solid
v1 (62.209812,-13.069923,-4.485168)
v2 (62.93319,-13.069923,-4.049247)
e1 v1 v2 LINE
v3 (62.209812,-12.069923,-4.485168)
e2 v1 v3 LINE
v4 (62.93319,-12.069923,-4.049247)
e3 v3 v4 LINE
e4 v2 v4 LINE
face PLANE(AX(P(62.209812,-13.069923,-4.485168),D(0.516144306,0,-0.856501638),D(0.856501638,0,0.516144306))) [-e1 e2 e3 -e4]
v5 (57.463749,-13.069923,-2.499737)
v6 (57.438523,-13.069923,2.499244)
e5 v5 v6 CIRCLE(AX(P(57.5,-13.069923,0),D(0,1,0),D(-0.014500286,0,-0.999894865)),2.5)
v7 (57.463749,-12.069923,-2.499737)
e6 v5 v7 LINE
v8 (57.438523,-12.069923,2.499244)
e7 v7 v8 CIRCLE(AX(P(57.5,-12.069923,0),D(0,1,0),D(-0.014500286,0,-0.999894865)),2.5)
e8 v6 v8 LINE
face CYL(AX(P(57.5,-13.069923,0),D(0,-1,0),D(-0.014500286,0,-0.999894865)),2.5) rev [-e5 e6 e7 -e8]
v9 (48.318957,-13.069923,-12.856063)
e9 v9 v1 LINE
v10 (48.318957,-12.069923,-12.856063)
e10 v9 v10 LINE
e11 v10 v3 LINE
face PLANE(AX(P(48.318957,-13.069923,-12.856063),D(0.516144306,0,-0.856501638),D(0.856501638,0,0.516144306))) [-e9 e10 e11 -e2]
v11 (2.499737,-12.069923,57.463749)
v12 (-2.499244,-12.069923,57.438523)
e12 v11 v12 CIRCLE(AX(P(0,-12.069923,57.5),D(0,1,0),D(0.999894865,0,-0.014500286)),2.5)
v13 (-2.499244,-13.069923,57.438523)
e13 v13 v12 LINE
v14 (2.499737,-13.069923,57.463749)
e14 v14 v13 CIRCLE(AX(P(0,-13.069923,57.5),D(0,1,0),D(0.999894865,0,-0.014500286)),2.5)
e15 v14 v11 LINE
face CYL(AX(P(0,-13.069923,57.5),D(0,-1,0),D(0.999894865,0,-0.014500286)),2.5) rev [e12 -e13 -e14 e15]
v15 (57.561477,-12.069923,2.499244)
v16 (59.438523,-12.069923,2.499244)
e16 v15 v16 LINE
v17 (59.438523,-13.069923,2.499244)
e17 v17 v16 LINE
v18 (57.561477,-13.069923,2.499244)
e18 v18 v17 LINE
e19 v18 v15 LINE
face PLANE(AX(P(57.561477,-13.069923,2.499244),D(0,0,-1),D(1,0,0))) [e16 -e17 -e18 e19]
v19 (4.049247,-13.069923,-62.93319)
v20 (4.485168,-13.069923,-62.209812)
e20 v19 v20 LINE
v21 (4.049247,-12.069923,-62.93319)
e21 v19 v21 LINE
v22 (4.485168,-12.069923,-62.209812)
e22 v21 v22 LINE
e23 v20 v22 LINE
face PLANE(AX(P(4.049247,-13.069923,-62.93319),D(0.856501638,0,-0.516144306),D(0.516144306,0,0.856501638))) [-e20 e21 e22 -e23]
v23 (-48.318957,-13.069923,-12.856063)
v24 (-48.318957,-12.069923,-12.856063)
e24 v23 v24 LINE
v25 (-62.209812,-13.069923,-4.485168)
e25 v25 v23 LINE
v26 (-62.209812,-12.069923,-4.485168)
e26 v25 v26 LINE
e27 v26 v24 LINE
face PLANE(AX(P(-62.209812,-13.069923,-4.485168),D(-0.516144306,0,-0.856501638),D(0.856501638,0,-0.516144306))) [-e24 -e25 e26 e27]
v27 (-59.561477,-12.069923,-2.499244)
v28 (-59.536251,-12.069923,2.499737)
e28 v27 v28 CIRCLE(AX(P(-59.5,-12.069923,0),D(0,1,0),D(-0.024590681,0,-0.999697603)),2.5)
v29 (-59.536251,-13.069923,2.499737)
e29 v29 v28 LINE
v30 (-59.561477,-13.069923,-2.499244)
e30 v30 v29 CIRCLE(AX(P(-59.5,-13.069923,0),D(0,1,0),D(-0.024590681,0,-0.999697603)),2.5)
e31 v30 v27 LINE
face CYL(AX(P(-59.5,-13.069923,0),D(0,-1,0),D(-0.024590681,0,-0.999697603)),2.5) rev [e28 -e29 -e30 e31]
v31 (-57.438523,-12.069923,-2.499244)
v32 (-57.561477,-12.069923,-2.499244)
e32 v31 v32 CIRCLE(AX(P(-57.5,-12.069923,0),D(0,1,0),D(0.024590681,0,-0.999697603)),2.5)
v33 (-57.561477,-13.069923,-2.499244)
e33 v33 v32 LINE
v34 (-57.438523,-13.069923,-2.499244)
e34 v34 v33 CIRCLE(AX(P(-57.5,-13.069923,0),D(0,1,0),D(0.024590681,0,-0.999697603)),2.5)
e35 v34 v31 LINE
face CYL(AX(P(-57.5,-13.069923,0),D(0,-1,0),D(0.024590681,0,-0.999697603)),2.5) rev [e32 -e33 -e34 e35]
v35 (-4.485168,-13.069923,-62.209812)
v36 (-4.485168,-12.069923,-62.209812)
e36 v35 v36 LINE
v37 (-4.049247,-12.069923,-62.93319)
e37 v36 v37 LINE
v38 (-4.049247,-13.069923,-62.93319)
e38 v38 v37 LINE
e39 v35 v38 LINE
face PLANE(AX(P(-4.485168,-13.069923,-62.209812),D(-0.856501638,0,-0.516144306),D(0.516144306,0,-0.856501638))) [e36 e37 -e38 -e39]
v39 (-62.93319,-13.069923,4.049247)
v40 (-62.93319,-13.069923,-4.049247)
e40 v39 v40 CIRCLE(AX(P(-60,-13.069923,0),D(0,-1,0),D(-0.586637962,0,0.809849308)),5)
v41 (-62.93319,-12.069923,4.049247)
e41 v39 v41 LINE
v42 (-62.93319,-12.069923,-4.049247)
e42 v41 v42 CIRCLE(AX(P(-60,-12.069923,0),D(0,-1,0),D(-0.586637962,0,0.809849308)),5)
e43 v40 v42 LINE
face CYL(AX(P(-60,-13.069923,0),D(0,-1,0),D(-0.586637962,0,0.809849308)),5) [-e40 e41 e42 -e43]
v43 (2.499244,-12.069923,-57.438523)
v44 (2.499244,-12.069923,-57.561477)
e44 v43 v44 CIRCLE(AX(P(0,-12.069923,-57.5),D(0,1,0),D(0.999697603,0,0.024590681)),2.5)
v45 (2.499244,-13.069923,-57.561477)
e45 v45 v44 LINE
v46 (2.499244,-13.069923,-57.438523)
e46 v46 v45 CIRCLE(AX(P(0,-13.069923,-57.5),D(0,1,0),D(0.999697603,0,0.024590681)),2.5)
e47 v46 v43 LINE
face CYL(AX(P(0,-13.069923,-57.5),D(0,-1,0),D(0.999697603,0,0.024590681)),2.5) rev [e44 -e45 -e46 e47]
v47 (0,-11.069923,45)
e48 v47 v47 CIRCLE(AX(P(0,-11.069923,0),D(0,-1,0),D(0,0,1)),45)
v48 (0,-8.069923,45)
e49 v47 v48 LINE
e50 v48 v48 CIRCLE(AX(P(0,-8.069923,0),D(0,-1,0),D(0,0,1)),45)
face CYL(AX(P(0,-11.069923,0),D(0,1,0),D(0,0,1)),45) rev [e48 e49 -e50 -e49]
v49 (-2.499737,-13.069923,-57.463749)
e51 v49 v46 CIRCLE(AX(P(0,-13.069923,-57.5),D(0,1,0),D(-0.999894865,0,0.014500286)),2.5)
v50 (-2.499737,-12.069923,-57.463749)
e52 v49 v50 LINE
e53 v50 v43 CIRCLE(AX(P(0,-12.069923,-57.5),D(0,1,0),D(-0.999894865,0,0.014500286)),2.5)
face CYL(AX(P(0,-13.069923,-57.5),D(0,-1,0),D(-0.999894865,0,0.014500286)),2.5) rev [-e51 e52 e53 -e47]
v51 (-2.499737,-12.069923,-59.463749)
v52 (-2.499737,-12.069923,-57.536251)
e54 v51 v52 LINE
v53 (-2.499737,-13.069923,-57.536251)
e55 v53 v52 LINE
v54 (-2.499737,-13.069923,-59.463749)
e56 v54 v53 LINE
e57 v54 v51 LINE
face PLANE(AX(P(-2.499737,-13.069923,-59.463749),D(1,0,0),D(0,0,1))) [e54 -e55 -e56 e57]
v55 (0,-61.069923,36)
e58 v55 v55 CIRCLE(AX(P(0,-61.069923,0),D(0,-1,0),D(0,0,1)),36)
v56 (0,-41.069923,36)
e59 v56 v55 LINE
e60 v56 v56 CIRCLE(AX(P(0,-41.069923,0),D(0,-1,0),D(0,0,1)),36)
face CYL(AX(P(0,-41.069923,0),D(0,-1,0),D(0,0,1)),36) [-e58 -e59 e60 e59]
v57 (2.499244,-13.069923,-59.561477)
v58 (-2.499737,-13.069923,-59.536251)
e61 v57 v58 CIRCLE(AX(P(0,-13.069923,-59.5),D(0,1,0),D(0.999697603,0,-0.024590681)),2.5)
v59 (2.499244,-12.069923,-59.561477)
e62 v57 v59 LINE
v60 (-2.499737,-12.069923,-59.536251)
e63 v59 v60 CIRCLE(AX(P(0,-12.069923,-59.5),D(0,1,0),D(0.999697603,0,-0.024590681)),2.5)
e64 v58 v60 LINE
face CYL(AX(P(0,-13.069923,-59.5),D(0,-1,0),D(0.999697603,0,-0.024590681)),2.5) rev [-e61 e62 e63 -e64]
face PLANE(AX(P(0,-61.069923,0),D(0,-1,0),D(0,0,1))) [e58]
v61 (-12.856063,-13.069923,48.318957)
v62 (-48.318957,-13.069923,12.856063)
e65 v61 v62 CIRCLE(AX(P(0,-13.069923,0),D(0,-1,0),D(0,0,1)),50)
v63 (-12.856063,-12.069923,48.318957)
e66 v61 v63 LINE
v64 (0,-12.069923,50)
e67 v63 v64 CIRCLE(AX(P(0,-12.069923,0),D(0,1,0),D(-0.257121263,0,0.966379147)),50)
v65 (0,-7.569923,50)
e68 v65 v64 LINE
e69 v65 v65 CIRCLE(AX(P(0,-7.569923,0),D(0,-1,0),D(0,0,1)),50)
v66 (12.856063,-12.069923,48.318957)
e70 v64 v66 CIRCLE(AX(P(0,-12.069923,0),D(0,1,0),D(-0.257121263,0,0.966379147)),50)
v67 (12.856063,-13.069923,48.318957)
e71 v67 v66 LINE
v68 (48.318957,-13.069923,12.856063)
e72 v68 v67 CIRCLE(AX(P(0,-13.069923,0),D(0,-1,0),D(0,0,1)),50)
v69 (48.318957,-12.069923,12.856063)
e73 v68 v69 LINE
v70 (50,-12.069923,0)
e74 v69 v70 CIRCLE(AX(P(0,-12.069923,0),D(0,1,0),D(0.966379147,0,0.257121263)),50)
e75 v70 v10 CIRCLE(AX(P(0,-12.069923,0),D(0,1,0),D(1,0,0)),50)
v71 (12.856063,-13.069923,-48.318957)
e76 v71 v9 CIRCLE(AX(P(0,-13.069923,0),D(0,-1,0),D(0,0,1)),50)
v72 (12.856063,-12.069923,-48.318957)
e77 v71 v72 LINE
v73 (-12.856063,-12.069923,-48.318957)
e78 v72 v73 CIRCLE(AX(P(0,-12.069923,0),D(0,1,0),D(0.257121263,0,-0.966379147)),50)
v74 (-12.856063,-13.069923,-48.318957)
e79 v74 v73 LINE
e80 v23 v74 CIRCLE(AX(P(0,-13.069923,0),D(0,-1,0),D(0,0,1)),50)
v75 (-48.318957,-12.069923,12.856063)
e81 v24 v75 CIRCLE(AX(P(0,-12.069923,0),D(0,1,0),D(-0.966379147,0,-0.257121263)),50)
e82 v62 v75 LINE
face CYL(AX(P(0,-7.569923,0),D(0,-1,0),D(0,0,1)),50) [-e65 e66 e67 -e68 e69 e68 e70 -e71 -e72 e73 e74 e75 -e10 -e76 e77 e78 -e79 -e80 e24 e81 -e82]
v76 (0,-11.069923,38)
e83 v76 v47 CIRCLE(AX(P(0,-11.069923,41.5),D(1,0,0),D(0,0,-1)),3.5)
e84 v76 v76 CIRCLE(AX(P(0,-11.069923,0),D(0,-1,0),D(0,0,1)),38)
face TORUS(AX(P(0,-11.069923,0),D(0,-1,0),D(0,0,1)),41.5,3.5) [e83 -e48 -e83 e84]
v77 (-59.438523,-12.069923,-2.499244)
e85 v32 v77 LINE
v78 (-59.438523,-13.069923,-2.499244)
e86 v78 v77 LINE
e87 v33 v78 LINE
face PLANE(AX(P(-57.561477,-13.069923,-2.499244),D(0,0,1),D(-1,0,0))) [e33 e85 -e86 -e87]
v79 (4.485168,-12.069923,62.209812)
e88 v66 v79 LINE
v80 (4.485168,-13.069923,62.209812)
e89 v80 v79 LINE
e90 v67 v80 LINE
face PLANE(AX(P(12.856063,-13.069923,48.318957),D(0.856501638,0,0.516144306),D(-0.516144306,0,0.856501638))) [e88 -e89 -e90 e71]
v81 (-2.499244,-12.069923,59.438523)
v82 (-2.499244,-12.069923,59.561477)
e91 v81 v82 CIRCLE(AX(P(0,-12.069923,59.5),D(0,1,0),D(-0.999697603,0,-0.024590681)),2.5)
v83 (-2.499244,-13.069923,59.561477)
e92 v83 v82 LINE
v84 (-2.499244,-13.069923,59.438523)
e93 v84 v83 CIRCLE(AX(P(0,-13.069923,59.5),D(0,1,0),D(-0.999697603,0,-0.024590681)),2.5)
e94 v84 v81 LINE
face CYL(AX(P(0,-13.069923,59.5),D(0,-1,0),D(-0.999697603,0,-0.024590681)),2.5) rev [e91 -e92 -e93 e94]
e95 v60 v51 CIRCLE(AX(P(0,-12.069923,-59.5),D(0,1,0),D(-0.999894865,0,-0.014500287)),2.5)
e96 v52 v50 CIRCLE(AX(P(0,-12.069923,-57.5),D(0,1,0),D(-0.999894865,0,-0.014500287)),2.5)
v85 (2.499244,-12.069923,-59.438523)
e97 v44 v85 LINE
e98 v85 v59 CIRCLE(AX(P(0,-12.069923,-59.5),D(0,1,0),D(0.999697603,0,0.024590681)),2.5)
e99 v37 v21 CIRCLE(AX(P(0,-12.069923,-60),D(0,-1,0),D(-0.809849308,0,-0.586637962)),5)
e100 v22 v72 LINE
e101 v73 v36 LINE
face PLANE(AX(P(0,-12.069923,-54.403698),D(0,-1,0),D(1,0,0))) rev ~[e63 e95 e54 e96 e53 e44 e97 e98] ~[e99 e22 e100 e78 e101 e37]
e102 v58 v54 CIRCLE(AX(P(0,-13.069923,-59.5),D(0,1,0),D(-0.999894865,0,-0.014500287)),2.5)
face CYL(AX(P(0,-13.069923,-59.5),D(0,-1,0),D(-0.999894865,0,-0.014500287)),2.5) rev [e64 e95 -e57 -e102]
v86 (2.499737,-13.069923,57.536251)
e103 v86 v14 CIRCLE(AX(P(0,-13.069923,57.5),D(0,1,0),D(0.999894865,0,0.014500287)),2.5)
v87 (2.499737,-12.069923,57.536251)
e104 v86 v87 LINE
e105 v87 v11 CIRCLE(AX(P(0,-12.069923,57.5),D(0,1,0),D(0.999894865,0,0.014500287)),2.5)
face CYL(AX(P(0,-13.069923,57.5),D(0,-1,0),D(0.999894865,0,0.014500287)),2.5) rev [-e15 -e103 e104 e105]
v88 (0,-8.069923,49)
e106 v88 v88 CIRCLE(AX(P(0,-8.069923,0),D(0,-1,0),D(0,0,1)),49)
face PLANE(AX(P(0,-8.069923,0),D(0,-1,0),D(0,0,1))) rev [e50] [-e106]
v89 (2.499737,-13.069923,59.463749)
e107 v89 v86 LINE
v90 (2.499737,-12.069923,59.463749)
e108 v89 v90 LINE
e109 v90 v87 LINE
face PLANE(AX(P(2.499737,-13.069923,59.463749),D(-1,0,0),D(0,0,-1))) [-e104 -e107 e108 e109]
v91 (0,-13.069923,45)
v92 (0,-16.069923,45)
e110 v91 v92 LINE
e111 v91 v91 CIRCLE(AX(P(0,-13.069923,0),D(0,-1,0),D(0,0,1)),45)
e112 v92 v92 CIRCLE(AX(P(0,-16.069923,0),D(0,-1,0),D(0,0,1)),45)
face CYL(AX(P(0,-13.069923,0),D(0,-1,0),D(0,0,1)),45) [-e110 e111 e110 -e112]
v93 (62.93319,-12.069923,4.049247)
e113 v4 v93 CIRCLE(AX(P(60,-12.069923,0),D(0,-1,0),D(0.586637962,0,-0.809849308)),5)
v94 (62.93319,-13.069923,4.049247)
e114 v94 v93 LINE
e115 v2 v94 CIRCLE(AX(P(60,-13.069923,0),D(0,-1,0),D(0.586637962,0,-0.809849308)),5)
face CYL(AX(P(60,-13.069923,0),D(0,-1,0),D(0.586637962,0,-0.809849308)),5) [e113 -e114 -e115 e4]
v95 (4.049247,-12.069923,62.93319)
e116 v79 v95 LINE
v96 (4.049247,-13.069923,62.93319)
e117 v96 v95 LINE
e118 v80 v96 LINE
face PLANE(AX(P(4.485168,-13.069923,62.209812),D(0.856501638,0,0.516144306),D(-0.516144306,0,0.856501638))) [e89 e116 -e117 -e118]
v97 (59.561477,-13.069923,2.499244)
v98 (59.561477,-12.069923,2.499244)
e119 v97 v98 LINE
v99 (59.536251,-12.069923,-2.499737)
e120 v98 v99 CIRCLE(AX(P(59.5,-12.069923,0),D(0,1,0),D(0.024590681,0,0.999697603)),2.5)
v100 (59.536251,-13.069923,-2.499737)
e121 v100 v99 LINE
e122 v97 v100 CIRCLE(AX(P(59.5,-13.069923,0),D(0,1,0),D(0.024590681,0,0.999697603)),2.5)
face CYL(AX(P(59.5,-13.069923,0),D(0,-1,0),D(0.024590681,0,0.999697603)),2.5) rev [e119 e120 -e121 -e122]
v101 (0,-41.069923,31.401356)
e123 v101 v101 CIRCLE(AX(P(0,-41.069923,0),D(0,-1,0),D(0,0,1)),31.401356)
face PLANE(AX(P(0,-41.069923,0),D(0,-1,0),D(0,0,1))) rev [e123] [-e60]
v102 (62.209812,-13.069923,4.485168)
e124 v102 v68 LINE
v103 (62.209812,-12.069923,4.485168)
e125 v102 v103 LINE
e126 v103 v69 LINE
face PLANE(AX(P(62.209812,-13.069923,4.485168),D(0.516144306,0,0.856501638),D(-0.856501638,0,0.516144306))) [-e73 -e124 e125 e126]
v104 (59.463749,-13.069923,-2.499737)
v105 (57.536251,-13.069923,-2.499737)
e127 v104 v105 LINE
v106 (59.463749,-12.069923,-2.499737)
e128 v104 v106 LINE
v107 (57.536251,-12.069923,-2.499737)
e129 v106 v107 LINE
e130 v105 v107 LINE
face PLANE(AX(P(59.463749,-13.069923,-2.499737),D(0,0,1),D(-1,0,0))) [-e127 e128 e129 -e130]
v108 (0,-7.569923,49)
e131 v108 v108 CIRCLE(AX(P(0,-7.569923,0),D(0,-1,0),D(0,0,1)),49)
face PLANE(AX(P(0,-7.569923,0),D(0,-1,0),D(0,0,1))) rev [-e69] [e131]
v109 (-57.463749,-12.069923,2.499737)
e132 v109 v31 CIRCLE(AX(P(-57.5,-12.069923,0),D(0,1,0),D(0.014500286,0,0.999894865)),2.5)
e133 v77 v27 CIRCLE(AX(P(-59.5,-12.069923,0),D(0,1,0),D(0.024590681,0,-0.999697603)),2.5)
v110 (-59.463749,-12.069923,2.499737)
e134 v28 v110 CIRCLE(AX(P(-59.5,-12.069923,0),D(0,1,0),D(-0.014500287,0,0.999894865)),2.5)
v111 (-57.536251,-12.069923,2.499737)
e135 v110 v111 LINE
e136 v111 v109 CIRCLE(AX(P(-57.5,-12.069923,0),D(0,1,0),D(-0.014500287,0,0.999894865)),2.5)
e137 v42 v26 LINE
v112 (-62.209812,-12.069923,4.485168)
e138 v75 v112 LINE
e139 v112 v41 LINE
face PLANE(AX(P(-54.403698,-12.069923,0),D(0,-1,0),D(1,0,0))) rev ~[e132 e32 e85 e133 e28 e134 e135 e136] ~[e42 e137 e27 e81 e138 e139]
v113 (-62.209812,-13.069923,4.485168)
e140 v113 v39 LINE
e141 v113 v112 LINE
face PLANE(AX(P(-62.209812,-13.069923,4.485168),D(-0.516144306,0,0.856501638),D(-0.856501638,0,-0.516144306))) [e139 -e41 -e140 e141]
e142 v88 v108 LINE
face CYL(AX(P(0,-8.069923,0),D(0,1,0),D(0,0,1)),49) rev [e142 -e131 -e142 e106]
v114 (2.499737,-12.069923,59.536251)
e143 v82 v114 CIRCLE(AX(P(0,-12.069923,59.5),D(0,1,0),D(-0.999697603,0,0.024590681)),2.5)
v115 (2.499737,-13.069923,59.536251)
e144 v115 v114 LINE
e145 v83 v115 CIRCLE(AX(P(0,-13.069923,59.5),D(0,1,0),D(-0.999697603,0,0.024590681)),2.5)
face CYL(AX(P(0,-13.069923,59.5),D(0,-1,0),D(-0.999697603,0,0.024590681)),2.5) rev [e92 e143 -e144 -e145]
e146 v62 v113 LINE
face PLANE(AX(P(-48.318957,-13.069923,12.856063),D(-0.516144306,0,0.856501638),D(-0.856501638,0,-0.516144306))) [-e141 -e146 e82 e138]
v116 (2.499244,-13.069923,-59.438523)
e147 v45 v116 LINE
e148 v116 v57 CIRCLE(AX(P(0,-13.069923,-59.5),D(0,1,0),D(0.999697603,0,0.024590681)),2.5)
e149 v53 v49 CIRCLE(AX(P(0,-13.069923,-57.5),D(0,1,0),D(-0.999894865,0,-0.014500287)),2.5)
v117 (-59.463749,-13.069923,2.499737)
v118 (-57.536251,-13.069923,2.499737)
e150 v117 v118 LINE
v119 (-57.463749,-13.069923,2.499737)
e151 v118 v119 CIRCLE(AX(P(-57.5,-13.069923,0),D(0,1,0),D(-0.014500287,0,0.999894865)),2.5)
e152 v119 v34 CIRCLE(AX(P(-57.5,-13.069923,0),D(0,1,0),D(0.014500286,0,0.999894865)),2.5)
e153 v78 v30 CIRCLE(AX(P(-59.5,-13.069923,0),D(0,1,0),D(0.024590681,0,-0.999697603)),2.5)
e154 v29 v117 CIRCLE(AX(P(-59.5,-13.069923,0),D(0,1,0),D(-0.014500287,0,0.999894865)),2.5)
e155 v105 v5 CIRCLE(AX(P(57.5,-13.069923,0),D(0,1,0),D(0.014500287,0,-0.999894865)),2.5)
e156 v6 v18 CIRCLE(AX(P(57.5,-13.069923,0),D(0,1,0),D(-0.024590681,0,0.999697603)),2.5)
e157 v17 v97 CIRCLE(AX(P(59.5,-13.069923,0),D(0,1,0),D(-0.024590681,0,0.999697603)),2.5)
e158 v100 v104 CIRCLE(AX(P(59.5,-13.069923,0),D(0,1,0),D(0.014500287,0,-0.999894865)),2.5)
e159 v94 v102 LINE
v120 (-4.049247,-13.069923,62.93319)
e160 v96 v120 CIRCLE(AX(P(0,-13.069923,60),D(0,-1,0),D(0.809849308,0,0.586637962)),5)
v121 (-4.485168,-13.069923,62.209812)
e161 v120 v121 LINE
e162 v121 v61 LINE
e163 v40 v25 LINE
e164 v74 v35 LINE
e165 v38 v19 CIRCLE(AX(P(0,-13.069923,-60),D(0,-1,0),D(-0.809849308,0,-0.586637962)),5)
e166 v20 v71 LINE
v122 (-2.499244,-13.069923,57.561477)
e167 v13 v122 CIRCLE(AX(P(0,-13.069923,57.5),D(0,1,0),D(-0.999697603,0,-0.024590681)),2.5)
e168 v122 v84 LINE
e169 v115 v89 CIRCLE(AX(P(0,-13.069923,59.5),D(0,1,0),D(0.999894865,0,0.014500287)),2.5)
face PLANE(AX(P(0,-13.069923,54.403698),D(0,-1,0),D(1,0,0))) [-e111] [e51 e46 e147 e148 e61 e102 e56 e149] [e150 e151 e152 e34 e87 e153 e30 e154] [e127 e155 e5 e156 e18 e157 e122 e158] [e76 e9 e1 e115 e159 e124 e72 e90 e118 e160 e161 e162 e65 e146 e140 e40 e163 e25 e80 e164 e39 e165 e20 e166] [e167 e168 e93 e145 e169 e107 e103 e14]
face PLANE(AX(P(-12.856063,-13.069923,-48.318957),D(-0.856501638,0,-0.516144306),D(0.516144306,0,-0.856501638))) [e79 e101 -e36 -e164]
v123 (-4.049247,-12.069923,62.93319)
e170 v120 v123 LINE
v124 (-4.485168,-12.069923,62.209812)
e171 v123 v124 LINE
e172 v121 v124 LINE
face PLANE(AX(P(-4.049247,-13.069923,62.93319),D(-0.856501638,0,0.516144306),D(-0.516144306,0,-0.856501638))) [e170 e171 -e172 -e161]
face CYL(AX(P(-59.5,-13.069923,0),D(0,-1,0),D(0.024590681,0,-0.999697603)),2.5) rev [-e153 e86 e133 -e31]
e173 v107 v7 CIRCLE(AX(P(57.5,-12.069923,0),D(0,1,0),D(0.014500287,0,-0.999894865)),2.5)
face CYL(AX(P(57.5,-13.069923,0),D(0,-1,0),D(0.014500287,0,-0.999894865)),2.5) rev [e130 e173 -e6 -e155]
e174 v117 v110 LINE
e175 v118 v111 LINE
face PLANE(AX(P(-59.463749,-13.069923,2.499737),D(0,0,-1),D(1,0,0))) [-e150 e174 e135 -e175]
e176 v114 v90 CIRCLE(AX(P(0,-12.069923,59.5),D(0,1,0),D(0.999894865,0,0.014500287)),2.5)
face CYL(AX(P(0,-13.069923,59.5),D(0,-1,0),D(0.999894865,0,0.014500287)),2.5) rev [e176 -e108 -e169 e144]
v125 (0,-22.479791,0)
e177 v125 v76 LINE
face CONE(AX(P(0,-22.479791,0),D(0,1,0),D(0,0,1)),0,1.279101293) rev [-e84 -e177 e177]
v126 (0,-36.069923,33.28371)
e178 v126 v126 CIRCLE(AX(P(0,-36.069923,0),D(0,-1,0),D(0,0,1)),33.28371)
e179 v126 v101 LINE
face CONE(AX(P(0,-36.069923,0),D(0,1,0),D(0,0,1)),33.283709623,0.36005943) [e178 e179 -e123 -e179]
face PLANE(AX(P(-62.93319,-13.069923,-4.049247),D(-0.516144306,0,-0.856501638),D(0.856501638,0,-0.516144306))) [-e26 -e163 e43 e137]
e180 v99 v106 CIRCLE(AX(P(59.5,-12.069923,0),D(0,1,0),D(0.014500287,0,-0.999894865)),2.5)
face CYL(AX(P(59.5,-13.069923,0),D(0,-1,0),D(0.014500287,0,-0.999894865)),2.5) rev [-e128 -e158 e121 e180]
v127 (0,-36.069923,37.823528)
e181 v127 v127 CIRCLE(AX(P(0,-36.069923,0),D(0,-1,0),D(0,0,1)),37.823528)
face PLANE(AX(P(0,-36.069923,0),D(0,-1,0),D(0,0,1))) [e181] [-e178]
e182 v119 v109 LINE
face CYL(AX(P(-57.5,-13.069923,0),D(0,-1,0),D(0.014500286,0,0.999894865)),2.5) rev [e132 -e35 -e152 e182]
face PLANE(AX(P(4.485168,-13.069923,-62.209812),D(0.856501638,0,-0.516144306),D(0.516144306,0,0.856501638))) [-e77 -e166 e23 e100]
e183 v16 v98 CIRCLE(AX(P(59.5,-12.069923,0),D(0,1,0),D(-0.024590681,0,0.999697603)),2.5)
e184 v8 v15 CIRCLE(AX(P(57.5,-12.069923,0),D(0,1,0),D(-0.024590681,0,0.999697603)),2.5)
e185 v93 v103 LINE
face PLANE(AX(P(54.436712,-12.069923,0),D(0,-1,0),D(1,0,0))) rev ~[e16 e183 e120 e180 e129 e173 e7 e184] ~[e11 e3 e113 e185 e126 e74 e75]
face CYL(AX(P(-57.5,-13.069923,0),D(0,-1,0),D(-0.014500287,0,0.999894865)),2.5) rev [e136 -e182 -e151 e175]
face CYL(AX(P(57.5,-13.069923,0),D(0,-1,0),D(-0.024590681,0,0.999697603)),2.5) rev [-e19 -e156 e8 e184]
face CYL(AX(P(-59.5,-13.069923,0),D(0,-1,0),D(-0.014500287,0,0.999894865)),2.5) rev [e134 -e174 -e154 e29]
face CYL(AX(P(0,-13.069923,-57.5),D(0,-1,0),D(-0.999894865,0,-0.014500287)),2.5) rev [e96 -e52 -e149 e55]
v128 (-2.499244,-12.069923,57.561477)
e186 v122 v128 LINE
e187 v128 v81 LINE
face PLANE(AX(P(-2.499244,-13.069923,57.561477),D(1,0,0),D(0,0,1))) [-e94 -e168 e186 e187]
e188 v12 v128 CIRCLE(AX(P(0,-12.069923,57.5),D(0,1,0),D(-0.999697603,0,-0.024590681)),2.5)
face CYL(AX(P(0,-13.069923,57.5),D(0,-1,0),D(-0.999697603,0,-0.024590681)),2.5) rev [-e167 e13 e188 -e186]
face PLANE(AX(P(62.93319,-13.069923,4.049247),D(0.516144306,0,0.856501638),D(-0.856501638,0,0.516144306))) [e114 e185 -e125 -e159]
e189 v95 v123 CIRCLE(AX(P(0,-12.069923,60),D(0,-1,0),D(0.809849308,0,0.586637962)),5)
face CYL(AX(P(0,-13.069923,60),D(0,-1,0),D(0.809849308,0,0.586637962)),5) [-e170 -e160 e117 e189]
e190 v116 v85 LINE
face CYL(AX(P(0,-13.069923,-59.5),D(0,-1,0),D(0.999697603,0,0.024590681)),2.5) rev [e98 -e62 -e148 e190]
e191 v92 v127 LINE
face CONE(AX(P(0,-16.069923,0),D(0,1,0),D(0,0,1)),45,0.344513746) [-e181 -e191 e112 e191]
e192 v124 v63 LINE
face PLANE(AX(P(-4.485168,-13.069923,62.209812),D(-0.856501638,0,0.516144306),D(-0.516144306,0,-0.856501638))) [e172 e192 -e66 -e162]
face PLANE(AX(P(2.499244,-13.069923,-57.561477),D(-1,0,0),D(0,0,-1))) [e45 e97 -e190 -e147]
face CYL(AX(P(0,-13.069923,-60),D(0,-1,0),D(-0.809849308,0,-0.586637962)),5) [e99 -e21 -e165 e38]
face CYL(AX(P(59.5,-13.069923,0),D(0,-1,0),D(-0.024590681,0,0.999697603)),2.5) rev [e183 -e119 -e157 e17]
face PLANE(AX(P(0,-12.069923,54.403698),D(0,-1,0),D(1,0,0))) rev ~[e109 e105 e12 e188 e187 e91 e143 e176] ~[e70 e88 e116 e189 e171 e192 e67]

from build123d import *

# Parameters (mm, degrees)
F3_DEPTH = 1


with BuildPart() as f1:
    # F0 (on Right) → F1 (revolve)
    with BuildSketch(Plane.YZ):
        with BuildLine():
            Line((-61.0699225962, 0), (-22.4797911942, 0))
            Line((-22.4797911942, 0), (-11.0699225962, 38))
            ThreePointArc((-11.0699225962, 38), (-7.5699225962, 41.5), (-11.0699225962, 45))
            Line((-11.0699225962, 45), (-8.0699225962, 45))
            Line((-8.0699225962, 45), (-8.0699225962, 49))
            Line((-8.0699225962, 49), (-7.5699225962, 49))
            Line((-7.5699225962, 49), (-7.5699225962, 50))
            Line((-7.5699225962, 50), (-13.0699225962, 50))
            Line((-13.0699225962, 50), (-13.0699225962, 45))
            Line((-13.0699225962, 45), (-16.0699225962, 45))
            Line((-16.0699225962, 45), (-36.0699225962, 37.823528317))
            Line((-36.0699225962, 37.823528317), (-36.0699225962, 33.2837096231))
            Line((-36.0699225962, 33.2837096231), (-41.0699225962, 31.4013561058))
            Line((-41.0699225962, 31.4013561058), (-41.0699225962, 36))
            Line((-41.0699225962, 36), (-61.0699225962, 36))
            Line((-61.0699225962, 36), (-61.0699225962, 0))
        make_face()
    revolve(axis=Axis((0, -30.5349612981, 0), (0, -1, 0)))

    # F2 (on face) → F3 (join)
    with BuildSketch(Plane.XZ.offset(13.0699225962)):
        with BuildLine():
            Line((12.8560631669, 48.3189573547), (4.4851679108, 62.2098119404))
            Line((4.4851679108, 62.2098119404), (4.04924654, 62.9331898094))
            ThreePointArc((4.04924654, 62.9331898094), (0, 65), (-4.04924654, 62.9331898094))
            Line((-4.04924654, 62.9331898094), (-4.4851679108, 62.2098119404))
            Line((-4.4851679108, 62.2098119404), (-12.8560631669, 48.3189573547))
            ThreePointArc((-12.8560631669, 48.3189573547), (0, 50), (12.8560631669, 48.3189573547))
        make_face()
        with BuildLine():
            ThreePointArc((2.4997371633, 59.536250715), (2.5, 59.5), (2.4997371633, 59.463749285))
            Line((2.4997371633, 59.463749285), (2.4997371633, 57.536250715))
            ThreePointArc((2.4997371633, 57.536250715), (2.5, 57.5), (2.4997371633, 57.463749285))
            ThreePointArc((2.4997371633, 57.463749285), (0.0126154042, 55.0000318299), (-2.4992440087, 57.4385232966))
            ThreePointArc((-2.4992440087, 57.4385232966), (-2.5, 57.5), (-2.4992440087, 57.5614767034))
            Line((-2.4992440087, 57.5614767034), (-2.4992440087, 59.4385232966))
            ThreePointArc((-2.4992440087, 59.4385232966), (-2.5, 59.5), (-2.4992440087, 59.5614767034))
            ThreePointArc((-2.4992440087, 59.5614767034), (0.0126154042, 61.9999681701), (2.4997371633, 59.536250715))
        make_face(mode=Mode.SUBTRACT)
        with BuildLine():
            Line((62.2098119404, 4.4851679108), (48.3189573547, 12.8560631669))
            ThreePointArc((48.3189573547, 12.8560631669), (49.5779581454, 6.4827514322), (50, 0))
            ThreePointArc((50, 0), (49.5779581454, -6.4827514322), (48.3189573547, -12.8560631669))
            Line((48.3189573547, -12.8560631669), (62.2098119404, -4.4851679108))
            Line((62.2098119404, -4.4851679108), (62.9331898094, -4.04924654))
            ThreePointArc((62.9331898094, -4.04924654), (65, 0), (62.9331898094, 4.04924654))
            Line((62.9331898094, 4.04924654), (62.2098119404, 4.4851679108))
        make_face()
        with BuildLine():
            ThreePointArc((57.4385232966, 2.4992440087), (57.5, 2.5), (57.5614767034, 2.4992440087))
            Line((57.5614767034, 2.4992440087), (59.4385232966, 2.4992440087))
            ThreePointArc((59.4385232966, 2.4992440087), (59.5, 2.5), (59.5614767034, 2.4992440087))
            ThreePointArc((59.5614767034, 2.4992440087), (61.9999681701, -0.0126154042), (59.536250715, -2.4997371633))
            ThreePointArc((59.536250715, -2.4997371633), (59.5, -2.5), (59.463749285, -2.4997371633))
            Line((59.463749285, -2.4997371633), (57.536250715, -2.4997371633))
            ThreePointArc((57.536250715, -2.4997371633), (57.5, -2.5), (57.463749285, -2.4997371633))
            ThreePointArc((57.463749285, -2.4997371633), (55.0000318299, -0.0126154042), (57.4385232966, 2.4992440087))
        make_face(mode=Mode.SUBTRACT)
        with BuildLine():
            ThreePointArc((-48.3189573547, -12.8560631669), (-50, 0), (-48.3189573547, 12.8560631669))
            Line((-48.3189573547, 12.8560631669), (-62.2098119404, 4.4851679108))
            Line((-62.2098119404, 4.4851679108), (-62.9331898094, 4.04924654))
            ThreePointArc((-62.9331898094, 4.04924654), (-65, 0), (-62.9331898094, -4.04924654))
            Line((-62.9331898094, -4.04924654), (-62.2098119404, -4.4851679108))
            Line((-62.2098119404, -4.4851679108), (-48.3189573547, -12.8560631669))
        make_face()
        with BuildLine():
            ThreePointArc((-57.4385232966, -2.4992440087), (-57.5, -2.5), (-57.5614767034, -2.4992440087))
            Line((-57.5614767034, -2.4992440087), (-59.4385232966, -2.4992440087))
            ThreePointArc((-59.4385232966, -2.4992440087), (-59.5, -2.5), (-59.5614767034, -2.4992440087))
            ThreePointArc((-59.5614767034, -2.4992440087), (-61.9999681701, 0.0126154042), (-59.536250715, 2.4997371633))
            ThreePointArc((-59.536250715, 2.4997371633), (-59.5, 2.5), (-59.463749285, 2.4997371633))
            Line((-59.463749285, 2.4997371633), (-57.536250715, 2.4997371633))
            ThreePointArc((-57.536250715, 2.4997371633), (-57.5, 2.5), (-57.463749285, 2.4997371633))
            ThreePointArc((-57.463749285, 2.4997371633), (-55.0000318299, 0.0126154042), (-57.4385232966, -2.4992440087))
        make_face(mode=Mode.SUBTRACT)
        with BuildLine():
            Line((4.4851679108, -62.2098119404), (12.8560631669, -48.3189573547))
            ThreePointArc((12.8560631669, -48.3189573547), (0, -50), (-12.8560631669, -48.3189573547))
            Line((-12.8560631669, -48.3189573547), (-4.4851679108, -62.2098119404))
            Line((-4.4851679108, -62.2098119404), (-4.04924654, -62.9331898094))
            ThreePointArc((-4.04924654, -62.9331898094), (0, -65), (4.04924654, -62.9331898094))
            Line((4.04924654, -62.9331898094), (4.4851679108, -62.2098119404))
        make_face()
        with BuildLine():
            ThreePointArc((2.4992440087, -57.4385232966), (2.5, -57.5), (2.4992440087, -57.5614767034))
            Line((2.4992440087, -57.5614767034), (2.4992440087, -59.4385232966))
            ThreePointArc((2.4992440087, -59.4385232966), (2.5, -59.5), (2.4992440087, -59.5614767034))
            ThreePointArc((2.4992440087, -59.5614767034), (-0.0126154042, -61.9999681701), (-2.4997371633, -59.536250715))
            ThreePointArc((-2.4997371633, -59.536250715), (-2.5, -59.5), (-2.4997371633, -59.463749285))
            Line((-2.4997371633, -59.463749285), (-2.4997371633, -57.536250715))
            ThreePointArc((-2.4997371633, -57.536250715), (-2.5, -57.5), (-2.4997371633, -57.463749285))
            ThreePointArc((-2.4997371633, -57.463749285), (-0.0126154042, -55.0000318299), (2.4992440087, -57.4385232966))
        make_face(mode=Mode.SUBTRACT)
    extrude(amount=-F3_DEPTH)


solid = f1.part
